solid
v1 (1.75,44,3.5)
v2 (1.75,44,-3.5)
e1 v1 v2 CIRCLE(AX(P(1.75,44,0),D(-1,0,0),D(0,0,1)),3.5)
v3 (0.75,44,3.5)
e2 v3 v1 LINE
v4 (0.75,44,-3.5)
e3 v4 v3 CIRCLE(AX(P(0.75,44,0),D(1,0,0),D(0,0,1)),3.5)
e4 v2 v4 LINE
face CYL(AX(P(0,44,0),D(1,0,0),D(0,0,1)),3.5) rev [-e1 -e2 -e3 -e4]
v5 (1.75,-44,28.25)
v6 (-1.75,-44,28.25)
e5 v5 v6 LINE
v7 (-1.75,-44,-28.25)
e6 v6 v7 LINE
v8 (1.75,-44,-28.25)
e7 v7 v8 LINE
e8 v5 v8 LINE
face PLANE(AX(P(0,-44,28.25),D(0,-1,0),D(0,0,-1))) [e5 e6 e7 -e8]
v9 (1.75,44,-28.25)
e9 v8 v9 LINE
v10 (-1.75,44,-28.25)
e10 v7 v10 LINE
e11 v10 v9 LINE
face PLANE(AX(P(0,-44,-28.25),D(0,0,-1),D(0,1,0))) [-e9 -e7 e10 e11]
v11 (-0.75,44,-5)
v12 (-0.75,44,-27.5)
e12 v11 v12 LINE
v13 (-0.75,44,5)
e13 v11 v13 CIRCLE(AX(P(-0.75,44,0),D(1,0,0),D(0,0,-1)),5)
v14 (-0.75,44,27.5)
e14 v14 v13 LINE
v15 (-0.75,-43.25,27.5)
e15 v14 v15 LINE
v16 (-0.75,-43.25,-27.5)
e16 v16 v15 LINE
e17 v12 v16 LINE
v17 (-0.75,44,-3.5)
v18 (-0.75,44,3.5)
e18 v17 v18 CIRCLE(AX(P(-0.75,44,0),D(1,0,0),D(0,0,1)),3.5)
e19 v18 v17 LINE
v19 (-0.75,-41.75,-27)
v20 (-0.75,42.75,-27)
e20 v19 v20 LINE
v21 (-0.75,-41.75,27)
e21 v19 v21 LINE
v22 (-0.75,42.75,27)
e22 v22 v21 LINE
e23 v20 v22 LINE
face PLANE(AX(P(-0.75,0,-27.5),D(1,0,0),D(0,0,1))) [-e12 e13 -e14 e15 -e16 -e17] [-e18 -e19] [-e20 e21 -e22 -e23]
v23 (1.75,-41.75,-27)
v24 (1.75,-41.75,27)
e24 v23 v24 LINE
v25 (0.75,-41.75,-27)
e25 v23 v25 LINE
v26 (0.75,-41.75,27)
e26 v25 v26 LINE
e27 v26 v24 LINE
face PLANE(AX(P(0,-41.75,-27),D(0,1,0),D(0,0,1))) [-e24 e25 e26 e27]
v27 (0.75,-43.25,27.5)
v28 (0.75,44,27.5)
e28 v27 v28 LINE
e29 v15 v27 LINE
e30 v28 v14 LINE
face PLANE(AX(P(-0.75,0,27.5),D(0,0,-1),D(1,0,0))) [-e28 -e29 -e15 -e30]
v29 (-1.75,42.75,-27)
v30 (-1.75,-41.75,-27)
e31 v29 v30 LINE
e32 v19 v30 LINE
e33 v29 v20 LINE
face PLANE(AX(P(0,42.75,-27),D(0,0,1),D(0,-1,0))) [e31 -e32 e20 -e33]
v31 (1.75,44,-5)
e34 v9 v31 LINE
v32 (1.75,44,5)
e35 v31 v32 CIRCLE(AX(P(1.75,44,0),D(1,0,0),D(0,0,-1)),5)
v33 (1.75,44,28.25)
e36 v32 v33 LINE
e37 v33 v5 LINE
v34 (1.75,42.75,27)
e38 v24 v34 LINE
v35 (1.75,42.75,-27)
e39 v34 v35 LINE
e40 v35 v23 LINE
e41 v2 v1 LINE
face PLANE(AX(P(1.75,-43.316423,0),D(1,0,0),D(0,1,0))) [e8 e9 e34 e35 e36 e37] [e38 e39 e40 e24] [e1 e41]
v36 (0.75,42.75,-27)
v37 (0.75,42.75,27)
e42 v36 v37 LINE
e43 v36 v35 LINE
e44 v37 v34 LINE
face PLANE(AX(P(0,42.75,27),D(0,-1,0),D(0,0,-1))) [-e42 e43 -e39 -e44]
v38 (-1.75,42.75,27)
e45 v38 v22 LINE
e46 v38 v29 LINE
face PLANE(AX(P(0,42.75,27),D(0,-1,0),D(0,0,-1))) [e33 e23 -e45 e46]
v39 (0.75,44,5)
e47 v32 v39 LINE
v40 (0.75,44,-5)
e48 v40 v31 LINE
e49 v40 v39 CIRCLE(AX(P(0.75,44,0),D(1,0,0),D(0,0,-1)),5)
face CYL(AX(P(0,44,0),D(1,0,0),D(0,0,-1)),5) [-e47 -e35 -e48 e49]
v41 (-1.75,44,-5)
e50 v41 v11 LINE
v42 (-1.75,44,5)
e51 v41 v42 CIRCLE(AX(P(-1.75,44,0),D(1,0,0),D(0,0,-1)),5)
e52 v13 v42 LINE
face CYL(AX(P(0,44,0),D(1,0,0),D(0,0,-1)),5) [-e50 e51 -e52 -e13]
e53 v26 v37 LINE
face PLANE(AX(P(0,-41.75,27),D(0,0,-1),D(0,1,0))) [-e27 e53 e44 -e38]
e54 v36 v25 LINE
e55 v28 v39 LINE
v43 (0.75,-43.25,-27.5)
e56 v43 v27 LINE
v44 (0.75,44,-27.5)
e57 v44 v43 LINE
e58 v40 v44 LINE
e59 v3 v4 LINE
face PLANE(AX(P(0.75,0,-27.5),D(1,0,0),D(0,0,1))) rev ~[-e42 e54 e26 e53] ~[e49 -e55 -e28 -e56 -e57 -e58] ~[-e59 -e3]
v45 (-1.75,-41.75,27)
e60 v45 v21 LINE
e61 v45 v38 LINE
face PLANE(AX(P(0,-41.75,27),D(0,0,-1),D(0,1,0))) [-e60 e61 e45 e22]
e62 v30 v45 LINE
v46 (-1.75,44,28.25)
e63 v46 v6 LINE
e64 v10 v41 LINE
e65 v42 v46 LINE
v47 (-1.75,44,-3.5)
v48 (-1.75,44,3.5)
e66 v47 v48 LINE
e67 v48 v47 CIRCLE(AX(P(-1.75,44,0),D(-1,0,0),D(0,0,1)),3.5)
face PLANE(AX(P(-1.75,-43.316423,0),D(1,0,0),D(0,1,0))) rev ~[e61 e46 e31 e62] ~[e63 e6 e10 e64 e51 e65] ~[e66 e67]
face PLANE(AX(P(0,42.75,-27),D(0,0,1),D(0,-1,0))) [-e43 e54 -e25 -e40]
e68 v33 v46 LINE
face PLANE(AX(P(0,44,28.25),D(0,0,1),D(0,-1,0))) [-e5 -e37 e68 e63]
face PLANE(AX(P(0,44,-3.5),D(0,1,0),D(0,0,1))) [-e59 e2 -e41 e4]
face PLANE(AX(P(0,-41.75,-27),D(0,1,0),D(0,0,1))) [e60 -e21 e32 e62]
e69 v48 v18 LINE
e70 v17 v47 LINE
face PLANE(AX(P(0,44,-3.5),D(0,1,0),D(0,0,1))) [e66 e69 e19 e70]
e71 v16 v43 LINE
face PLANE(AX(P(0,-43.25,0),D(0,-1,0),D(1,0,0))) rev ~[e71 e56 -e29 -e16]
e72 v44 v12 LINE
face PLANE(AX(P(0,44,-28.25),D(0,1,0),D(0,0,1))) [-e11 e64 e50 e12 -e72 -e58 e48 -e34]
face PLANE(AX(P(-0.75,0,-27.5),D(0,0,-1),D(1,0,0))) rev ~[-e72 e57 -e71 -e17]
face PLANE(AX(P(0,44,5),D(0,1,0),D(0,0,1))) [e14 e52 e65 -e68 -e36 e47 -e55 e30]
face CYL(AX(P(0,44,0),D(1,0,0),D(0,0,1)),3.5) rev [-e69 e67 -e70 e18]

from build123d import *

# Parameters (mm, degrees)
F1_DEPTH      = 1.75
F2_W          = 1.5
F2_H          = 55
F3_DEPTH      = 43.25
F3_DEPTH_BACK = 58.6


with BuildPart() as f1:
    # F0 (on Right) → F1 (new body, symmetric)
    with BuildSketch(Plane.YZ):
        Polygon((-42.75, -27), (-42.75, 27), (-41.75, 27), (-41.75, 28.25), (-44, 28.25), (-44, -28.25), (-41.75, -28.25), (-41.75, -27), align=None)
        Polygon((-41.75, 27), (-42.75, 27), (-42.75, -27), (-41.75, -27), (-41.75, -26), (-41.75, 26), align=None)
        Polygon((-41.75, 28.25), (-41.75, 27), (42.75, 27), (42.75, -27), (-41.75, -27), (-41.75, -28.25), (44, -28.25), (44, -5), (44, -3.5), (44, 3.5), (44, 5), (44, 28.25), align=None)
        with BuildLine():
            ThreePointArc((44, -5), (49, 0), (44, 5))
            Line((44, 5), (44, 3.5))
            ThreePointArc((44, 3.5), (47.5, 0), (44, -3.5))
            Line((44, -3.5), (44, -5))
        make_face()
    extrude(amount=F1_DEPTH, both=True)

    # F2 (on Front) → F3 (cut, two sides)
    with BuildSketch(Plane.XZ) as f3_sk:
        Rectangle(F2_W, F2_H)
    extrude(amount=F3_DEPTH, mode=Mode.SUBTRACT)
    extrude(f3_sk.sketch, amount=-F3_DEPTH_BACK, mode=Mode.SUBTRACT)


solid = f1.part
